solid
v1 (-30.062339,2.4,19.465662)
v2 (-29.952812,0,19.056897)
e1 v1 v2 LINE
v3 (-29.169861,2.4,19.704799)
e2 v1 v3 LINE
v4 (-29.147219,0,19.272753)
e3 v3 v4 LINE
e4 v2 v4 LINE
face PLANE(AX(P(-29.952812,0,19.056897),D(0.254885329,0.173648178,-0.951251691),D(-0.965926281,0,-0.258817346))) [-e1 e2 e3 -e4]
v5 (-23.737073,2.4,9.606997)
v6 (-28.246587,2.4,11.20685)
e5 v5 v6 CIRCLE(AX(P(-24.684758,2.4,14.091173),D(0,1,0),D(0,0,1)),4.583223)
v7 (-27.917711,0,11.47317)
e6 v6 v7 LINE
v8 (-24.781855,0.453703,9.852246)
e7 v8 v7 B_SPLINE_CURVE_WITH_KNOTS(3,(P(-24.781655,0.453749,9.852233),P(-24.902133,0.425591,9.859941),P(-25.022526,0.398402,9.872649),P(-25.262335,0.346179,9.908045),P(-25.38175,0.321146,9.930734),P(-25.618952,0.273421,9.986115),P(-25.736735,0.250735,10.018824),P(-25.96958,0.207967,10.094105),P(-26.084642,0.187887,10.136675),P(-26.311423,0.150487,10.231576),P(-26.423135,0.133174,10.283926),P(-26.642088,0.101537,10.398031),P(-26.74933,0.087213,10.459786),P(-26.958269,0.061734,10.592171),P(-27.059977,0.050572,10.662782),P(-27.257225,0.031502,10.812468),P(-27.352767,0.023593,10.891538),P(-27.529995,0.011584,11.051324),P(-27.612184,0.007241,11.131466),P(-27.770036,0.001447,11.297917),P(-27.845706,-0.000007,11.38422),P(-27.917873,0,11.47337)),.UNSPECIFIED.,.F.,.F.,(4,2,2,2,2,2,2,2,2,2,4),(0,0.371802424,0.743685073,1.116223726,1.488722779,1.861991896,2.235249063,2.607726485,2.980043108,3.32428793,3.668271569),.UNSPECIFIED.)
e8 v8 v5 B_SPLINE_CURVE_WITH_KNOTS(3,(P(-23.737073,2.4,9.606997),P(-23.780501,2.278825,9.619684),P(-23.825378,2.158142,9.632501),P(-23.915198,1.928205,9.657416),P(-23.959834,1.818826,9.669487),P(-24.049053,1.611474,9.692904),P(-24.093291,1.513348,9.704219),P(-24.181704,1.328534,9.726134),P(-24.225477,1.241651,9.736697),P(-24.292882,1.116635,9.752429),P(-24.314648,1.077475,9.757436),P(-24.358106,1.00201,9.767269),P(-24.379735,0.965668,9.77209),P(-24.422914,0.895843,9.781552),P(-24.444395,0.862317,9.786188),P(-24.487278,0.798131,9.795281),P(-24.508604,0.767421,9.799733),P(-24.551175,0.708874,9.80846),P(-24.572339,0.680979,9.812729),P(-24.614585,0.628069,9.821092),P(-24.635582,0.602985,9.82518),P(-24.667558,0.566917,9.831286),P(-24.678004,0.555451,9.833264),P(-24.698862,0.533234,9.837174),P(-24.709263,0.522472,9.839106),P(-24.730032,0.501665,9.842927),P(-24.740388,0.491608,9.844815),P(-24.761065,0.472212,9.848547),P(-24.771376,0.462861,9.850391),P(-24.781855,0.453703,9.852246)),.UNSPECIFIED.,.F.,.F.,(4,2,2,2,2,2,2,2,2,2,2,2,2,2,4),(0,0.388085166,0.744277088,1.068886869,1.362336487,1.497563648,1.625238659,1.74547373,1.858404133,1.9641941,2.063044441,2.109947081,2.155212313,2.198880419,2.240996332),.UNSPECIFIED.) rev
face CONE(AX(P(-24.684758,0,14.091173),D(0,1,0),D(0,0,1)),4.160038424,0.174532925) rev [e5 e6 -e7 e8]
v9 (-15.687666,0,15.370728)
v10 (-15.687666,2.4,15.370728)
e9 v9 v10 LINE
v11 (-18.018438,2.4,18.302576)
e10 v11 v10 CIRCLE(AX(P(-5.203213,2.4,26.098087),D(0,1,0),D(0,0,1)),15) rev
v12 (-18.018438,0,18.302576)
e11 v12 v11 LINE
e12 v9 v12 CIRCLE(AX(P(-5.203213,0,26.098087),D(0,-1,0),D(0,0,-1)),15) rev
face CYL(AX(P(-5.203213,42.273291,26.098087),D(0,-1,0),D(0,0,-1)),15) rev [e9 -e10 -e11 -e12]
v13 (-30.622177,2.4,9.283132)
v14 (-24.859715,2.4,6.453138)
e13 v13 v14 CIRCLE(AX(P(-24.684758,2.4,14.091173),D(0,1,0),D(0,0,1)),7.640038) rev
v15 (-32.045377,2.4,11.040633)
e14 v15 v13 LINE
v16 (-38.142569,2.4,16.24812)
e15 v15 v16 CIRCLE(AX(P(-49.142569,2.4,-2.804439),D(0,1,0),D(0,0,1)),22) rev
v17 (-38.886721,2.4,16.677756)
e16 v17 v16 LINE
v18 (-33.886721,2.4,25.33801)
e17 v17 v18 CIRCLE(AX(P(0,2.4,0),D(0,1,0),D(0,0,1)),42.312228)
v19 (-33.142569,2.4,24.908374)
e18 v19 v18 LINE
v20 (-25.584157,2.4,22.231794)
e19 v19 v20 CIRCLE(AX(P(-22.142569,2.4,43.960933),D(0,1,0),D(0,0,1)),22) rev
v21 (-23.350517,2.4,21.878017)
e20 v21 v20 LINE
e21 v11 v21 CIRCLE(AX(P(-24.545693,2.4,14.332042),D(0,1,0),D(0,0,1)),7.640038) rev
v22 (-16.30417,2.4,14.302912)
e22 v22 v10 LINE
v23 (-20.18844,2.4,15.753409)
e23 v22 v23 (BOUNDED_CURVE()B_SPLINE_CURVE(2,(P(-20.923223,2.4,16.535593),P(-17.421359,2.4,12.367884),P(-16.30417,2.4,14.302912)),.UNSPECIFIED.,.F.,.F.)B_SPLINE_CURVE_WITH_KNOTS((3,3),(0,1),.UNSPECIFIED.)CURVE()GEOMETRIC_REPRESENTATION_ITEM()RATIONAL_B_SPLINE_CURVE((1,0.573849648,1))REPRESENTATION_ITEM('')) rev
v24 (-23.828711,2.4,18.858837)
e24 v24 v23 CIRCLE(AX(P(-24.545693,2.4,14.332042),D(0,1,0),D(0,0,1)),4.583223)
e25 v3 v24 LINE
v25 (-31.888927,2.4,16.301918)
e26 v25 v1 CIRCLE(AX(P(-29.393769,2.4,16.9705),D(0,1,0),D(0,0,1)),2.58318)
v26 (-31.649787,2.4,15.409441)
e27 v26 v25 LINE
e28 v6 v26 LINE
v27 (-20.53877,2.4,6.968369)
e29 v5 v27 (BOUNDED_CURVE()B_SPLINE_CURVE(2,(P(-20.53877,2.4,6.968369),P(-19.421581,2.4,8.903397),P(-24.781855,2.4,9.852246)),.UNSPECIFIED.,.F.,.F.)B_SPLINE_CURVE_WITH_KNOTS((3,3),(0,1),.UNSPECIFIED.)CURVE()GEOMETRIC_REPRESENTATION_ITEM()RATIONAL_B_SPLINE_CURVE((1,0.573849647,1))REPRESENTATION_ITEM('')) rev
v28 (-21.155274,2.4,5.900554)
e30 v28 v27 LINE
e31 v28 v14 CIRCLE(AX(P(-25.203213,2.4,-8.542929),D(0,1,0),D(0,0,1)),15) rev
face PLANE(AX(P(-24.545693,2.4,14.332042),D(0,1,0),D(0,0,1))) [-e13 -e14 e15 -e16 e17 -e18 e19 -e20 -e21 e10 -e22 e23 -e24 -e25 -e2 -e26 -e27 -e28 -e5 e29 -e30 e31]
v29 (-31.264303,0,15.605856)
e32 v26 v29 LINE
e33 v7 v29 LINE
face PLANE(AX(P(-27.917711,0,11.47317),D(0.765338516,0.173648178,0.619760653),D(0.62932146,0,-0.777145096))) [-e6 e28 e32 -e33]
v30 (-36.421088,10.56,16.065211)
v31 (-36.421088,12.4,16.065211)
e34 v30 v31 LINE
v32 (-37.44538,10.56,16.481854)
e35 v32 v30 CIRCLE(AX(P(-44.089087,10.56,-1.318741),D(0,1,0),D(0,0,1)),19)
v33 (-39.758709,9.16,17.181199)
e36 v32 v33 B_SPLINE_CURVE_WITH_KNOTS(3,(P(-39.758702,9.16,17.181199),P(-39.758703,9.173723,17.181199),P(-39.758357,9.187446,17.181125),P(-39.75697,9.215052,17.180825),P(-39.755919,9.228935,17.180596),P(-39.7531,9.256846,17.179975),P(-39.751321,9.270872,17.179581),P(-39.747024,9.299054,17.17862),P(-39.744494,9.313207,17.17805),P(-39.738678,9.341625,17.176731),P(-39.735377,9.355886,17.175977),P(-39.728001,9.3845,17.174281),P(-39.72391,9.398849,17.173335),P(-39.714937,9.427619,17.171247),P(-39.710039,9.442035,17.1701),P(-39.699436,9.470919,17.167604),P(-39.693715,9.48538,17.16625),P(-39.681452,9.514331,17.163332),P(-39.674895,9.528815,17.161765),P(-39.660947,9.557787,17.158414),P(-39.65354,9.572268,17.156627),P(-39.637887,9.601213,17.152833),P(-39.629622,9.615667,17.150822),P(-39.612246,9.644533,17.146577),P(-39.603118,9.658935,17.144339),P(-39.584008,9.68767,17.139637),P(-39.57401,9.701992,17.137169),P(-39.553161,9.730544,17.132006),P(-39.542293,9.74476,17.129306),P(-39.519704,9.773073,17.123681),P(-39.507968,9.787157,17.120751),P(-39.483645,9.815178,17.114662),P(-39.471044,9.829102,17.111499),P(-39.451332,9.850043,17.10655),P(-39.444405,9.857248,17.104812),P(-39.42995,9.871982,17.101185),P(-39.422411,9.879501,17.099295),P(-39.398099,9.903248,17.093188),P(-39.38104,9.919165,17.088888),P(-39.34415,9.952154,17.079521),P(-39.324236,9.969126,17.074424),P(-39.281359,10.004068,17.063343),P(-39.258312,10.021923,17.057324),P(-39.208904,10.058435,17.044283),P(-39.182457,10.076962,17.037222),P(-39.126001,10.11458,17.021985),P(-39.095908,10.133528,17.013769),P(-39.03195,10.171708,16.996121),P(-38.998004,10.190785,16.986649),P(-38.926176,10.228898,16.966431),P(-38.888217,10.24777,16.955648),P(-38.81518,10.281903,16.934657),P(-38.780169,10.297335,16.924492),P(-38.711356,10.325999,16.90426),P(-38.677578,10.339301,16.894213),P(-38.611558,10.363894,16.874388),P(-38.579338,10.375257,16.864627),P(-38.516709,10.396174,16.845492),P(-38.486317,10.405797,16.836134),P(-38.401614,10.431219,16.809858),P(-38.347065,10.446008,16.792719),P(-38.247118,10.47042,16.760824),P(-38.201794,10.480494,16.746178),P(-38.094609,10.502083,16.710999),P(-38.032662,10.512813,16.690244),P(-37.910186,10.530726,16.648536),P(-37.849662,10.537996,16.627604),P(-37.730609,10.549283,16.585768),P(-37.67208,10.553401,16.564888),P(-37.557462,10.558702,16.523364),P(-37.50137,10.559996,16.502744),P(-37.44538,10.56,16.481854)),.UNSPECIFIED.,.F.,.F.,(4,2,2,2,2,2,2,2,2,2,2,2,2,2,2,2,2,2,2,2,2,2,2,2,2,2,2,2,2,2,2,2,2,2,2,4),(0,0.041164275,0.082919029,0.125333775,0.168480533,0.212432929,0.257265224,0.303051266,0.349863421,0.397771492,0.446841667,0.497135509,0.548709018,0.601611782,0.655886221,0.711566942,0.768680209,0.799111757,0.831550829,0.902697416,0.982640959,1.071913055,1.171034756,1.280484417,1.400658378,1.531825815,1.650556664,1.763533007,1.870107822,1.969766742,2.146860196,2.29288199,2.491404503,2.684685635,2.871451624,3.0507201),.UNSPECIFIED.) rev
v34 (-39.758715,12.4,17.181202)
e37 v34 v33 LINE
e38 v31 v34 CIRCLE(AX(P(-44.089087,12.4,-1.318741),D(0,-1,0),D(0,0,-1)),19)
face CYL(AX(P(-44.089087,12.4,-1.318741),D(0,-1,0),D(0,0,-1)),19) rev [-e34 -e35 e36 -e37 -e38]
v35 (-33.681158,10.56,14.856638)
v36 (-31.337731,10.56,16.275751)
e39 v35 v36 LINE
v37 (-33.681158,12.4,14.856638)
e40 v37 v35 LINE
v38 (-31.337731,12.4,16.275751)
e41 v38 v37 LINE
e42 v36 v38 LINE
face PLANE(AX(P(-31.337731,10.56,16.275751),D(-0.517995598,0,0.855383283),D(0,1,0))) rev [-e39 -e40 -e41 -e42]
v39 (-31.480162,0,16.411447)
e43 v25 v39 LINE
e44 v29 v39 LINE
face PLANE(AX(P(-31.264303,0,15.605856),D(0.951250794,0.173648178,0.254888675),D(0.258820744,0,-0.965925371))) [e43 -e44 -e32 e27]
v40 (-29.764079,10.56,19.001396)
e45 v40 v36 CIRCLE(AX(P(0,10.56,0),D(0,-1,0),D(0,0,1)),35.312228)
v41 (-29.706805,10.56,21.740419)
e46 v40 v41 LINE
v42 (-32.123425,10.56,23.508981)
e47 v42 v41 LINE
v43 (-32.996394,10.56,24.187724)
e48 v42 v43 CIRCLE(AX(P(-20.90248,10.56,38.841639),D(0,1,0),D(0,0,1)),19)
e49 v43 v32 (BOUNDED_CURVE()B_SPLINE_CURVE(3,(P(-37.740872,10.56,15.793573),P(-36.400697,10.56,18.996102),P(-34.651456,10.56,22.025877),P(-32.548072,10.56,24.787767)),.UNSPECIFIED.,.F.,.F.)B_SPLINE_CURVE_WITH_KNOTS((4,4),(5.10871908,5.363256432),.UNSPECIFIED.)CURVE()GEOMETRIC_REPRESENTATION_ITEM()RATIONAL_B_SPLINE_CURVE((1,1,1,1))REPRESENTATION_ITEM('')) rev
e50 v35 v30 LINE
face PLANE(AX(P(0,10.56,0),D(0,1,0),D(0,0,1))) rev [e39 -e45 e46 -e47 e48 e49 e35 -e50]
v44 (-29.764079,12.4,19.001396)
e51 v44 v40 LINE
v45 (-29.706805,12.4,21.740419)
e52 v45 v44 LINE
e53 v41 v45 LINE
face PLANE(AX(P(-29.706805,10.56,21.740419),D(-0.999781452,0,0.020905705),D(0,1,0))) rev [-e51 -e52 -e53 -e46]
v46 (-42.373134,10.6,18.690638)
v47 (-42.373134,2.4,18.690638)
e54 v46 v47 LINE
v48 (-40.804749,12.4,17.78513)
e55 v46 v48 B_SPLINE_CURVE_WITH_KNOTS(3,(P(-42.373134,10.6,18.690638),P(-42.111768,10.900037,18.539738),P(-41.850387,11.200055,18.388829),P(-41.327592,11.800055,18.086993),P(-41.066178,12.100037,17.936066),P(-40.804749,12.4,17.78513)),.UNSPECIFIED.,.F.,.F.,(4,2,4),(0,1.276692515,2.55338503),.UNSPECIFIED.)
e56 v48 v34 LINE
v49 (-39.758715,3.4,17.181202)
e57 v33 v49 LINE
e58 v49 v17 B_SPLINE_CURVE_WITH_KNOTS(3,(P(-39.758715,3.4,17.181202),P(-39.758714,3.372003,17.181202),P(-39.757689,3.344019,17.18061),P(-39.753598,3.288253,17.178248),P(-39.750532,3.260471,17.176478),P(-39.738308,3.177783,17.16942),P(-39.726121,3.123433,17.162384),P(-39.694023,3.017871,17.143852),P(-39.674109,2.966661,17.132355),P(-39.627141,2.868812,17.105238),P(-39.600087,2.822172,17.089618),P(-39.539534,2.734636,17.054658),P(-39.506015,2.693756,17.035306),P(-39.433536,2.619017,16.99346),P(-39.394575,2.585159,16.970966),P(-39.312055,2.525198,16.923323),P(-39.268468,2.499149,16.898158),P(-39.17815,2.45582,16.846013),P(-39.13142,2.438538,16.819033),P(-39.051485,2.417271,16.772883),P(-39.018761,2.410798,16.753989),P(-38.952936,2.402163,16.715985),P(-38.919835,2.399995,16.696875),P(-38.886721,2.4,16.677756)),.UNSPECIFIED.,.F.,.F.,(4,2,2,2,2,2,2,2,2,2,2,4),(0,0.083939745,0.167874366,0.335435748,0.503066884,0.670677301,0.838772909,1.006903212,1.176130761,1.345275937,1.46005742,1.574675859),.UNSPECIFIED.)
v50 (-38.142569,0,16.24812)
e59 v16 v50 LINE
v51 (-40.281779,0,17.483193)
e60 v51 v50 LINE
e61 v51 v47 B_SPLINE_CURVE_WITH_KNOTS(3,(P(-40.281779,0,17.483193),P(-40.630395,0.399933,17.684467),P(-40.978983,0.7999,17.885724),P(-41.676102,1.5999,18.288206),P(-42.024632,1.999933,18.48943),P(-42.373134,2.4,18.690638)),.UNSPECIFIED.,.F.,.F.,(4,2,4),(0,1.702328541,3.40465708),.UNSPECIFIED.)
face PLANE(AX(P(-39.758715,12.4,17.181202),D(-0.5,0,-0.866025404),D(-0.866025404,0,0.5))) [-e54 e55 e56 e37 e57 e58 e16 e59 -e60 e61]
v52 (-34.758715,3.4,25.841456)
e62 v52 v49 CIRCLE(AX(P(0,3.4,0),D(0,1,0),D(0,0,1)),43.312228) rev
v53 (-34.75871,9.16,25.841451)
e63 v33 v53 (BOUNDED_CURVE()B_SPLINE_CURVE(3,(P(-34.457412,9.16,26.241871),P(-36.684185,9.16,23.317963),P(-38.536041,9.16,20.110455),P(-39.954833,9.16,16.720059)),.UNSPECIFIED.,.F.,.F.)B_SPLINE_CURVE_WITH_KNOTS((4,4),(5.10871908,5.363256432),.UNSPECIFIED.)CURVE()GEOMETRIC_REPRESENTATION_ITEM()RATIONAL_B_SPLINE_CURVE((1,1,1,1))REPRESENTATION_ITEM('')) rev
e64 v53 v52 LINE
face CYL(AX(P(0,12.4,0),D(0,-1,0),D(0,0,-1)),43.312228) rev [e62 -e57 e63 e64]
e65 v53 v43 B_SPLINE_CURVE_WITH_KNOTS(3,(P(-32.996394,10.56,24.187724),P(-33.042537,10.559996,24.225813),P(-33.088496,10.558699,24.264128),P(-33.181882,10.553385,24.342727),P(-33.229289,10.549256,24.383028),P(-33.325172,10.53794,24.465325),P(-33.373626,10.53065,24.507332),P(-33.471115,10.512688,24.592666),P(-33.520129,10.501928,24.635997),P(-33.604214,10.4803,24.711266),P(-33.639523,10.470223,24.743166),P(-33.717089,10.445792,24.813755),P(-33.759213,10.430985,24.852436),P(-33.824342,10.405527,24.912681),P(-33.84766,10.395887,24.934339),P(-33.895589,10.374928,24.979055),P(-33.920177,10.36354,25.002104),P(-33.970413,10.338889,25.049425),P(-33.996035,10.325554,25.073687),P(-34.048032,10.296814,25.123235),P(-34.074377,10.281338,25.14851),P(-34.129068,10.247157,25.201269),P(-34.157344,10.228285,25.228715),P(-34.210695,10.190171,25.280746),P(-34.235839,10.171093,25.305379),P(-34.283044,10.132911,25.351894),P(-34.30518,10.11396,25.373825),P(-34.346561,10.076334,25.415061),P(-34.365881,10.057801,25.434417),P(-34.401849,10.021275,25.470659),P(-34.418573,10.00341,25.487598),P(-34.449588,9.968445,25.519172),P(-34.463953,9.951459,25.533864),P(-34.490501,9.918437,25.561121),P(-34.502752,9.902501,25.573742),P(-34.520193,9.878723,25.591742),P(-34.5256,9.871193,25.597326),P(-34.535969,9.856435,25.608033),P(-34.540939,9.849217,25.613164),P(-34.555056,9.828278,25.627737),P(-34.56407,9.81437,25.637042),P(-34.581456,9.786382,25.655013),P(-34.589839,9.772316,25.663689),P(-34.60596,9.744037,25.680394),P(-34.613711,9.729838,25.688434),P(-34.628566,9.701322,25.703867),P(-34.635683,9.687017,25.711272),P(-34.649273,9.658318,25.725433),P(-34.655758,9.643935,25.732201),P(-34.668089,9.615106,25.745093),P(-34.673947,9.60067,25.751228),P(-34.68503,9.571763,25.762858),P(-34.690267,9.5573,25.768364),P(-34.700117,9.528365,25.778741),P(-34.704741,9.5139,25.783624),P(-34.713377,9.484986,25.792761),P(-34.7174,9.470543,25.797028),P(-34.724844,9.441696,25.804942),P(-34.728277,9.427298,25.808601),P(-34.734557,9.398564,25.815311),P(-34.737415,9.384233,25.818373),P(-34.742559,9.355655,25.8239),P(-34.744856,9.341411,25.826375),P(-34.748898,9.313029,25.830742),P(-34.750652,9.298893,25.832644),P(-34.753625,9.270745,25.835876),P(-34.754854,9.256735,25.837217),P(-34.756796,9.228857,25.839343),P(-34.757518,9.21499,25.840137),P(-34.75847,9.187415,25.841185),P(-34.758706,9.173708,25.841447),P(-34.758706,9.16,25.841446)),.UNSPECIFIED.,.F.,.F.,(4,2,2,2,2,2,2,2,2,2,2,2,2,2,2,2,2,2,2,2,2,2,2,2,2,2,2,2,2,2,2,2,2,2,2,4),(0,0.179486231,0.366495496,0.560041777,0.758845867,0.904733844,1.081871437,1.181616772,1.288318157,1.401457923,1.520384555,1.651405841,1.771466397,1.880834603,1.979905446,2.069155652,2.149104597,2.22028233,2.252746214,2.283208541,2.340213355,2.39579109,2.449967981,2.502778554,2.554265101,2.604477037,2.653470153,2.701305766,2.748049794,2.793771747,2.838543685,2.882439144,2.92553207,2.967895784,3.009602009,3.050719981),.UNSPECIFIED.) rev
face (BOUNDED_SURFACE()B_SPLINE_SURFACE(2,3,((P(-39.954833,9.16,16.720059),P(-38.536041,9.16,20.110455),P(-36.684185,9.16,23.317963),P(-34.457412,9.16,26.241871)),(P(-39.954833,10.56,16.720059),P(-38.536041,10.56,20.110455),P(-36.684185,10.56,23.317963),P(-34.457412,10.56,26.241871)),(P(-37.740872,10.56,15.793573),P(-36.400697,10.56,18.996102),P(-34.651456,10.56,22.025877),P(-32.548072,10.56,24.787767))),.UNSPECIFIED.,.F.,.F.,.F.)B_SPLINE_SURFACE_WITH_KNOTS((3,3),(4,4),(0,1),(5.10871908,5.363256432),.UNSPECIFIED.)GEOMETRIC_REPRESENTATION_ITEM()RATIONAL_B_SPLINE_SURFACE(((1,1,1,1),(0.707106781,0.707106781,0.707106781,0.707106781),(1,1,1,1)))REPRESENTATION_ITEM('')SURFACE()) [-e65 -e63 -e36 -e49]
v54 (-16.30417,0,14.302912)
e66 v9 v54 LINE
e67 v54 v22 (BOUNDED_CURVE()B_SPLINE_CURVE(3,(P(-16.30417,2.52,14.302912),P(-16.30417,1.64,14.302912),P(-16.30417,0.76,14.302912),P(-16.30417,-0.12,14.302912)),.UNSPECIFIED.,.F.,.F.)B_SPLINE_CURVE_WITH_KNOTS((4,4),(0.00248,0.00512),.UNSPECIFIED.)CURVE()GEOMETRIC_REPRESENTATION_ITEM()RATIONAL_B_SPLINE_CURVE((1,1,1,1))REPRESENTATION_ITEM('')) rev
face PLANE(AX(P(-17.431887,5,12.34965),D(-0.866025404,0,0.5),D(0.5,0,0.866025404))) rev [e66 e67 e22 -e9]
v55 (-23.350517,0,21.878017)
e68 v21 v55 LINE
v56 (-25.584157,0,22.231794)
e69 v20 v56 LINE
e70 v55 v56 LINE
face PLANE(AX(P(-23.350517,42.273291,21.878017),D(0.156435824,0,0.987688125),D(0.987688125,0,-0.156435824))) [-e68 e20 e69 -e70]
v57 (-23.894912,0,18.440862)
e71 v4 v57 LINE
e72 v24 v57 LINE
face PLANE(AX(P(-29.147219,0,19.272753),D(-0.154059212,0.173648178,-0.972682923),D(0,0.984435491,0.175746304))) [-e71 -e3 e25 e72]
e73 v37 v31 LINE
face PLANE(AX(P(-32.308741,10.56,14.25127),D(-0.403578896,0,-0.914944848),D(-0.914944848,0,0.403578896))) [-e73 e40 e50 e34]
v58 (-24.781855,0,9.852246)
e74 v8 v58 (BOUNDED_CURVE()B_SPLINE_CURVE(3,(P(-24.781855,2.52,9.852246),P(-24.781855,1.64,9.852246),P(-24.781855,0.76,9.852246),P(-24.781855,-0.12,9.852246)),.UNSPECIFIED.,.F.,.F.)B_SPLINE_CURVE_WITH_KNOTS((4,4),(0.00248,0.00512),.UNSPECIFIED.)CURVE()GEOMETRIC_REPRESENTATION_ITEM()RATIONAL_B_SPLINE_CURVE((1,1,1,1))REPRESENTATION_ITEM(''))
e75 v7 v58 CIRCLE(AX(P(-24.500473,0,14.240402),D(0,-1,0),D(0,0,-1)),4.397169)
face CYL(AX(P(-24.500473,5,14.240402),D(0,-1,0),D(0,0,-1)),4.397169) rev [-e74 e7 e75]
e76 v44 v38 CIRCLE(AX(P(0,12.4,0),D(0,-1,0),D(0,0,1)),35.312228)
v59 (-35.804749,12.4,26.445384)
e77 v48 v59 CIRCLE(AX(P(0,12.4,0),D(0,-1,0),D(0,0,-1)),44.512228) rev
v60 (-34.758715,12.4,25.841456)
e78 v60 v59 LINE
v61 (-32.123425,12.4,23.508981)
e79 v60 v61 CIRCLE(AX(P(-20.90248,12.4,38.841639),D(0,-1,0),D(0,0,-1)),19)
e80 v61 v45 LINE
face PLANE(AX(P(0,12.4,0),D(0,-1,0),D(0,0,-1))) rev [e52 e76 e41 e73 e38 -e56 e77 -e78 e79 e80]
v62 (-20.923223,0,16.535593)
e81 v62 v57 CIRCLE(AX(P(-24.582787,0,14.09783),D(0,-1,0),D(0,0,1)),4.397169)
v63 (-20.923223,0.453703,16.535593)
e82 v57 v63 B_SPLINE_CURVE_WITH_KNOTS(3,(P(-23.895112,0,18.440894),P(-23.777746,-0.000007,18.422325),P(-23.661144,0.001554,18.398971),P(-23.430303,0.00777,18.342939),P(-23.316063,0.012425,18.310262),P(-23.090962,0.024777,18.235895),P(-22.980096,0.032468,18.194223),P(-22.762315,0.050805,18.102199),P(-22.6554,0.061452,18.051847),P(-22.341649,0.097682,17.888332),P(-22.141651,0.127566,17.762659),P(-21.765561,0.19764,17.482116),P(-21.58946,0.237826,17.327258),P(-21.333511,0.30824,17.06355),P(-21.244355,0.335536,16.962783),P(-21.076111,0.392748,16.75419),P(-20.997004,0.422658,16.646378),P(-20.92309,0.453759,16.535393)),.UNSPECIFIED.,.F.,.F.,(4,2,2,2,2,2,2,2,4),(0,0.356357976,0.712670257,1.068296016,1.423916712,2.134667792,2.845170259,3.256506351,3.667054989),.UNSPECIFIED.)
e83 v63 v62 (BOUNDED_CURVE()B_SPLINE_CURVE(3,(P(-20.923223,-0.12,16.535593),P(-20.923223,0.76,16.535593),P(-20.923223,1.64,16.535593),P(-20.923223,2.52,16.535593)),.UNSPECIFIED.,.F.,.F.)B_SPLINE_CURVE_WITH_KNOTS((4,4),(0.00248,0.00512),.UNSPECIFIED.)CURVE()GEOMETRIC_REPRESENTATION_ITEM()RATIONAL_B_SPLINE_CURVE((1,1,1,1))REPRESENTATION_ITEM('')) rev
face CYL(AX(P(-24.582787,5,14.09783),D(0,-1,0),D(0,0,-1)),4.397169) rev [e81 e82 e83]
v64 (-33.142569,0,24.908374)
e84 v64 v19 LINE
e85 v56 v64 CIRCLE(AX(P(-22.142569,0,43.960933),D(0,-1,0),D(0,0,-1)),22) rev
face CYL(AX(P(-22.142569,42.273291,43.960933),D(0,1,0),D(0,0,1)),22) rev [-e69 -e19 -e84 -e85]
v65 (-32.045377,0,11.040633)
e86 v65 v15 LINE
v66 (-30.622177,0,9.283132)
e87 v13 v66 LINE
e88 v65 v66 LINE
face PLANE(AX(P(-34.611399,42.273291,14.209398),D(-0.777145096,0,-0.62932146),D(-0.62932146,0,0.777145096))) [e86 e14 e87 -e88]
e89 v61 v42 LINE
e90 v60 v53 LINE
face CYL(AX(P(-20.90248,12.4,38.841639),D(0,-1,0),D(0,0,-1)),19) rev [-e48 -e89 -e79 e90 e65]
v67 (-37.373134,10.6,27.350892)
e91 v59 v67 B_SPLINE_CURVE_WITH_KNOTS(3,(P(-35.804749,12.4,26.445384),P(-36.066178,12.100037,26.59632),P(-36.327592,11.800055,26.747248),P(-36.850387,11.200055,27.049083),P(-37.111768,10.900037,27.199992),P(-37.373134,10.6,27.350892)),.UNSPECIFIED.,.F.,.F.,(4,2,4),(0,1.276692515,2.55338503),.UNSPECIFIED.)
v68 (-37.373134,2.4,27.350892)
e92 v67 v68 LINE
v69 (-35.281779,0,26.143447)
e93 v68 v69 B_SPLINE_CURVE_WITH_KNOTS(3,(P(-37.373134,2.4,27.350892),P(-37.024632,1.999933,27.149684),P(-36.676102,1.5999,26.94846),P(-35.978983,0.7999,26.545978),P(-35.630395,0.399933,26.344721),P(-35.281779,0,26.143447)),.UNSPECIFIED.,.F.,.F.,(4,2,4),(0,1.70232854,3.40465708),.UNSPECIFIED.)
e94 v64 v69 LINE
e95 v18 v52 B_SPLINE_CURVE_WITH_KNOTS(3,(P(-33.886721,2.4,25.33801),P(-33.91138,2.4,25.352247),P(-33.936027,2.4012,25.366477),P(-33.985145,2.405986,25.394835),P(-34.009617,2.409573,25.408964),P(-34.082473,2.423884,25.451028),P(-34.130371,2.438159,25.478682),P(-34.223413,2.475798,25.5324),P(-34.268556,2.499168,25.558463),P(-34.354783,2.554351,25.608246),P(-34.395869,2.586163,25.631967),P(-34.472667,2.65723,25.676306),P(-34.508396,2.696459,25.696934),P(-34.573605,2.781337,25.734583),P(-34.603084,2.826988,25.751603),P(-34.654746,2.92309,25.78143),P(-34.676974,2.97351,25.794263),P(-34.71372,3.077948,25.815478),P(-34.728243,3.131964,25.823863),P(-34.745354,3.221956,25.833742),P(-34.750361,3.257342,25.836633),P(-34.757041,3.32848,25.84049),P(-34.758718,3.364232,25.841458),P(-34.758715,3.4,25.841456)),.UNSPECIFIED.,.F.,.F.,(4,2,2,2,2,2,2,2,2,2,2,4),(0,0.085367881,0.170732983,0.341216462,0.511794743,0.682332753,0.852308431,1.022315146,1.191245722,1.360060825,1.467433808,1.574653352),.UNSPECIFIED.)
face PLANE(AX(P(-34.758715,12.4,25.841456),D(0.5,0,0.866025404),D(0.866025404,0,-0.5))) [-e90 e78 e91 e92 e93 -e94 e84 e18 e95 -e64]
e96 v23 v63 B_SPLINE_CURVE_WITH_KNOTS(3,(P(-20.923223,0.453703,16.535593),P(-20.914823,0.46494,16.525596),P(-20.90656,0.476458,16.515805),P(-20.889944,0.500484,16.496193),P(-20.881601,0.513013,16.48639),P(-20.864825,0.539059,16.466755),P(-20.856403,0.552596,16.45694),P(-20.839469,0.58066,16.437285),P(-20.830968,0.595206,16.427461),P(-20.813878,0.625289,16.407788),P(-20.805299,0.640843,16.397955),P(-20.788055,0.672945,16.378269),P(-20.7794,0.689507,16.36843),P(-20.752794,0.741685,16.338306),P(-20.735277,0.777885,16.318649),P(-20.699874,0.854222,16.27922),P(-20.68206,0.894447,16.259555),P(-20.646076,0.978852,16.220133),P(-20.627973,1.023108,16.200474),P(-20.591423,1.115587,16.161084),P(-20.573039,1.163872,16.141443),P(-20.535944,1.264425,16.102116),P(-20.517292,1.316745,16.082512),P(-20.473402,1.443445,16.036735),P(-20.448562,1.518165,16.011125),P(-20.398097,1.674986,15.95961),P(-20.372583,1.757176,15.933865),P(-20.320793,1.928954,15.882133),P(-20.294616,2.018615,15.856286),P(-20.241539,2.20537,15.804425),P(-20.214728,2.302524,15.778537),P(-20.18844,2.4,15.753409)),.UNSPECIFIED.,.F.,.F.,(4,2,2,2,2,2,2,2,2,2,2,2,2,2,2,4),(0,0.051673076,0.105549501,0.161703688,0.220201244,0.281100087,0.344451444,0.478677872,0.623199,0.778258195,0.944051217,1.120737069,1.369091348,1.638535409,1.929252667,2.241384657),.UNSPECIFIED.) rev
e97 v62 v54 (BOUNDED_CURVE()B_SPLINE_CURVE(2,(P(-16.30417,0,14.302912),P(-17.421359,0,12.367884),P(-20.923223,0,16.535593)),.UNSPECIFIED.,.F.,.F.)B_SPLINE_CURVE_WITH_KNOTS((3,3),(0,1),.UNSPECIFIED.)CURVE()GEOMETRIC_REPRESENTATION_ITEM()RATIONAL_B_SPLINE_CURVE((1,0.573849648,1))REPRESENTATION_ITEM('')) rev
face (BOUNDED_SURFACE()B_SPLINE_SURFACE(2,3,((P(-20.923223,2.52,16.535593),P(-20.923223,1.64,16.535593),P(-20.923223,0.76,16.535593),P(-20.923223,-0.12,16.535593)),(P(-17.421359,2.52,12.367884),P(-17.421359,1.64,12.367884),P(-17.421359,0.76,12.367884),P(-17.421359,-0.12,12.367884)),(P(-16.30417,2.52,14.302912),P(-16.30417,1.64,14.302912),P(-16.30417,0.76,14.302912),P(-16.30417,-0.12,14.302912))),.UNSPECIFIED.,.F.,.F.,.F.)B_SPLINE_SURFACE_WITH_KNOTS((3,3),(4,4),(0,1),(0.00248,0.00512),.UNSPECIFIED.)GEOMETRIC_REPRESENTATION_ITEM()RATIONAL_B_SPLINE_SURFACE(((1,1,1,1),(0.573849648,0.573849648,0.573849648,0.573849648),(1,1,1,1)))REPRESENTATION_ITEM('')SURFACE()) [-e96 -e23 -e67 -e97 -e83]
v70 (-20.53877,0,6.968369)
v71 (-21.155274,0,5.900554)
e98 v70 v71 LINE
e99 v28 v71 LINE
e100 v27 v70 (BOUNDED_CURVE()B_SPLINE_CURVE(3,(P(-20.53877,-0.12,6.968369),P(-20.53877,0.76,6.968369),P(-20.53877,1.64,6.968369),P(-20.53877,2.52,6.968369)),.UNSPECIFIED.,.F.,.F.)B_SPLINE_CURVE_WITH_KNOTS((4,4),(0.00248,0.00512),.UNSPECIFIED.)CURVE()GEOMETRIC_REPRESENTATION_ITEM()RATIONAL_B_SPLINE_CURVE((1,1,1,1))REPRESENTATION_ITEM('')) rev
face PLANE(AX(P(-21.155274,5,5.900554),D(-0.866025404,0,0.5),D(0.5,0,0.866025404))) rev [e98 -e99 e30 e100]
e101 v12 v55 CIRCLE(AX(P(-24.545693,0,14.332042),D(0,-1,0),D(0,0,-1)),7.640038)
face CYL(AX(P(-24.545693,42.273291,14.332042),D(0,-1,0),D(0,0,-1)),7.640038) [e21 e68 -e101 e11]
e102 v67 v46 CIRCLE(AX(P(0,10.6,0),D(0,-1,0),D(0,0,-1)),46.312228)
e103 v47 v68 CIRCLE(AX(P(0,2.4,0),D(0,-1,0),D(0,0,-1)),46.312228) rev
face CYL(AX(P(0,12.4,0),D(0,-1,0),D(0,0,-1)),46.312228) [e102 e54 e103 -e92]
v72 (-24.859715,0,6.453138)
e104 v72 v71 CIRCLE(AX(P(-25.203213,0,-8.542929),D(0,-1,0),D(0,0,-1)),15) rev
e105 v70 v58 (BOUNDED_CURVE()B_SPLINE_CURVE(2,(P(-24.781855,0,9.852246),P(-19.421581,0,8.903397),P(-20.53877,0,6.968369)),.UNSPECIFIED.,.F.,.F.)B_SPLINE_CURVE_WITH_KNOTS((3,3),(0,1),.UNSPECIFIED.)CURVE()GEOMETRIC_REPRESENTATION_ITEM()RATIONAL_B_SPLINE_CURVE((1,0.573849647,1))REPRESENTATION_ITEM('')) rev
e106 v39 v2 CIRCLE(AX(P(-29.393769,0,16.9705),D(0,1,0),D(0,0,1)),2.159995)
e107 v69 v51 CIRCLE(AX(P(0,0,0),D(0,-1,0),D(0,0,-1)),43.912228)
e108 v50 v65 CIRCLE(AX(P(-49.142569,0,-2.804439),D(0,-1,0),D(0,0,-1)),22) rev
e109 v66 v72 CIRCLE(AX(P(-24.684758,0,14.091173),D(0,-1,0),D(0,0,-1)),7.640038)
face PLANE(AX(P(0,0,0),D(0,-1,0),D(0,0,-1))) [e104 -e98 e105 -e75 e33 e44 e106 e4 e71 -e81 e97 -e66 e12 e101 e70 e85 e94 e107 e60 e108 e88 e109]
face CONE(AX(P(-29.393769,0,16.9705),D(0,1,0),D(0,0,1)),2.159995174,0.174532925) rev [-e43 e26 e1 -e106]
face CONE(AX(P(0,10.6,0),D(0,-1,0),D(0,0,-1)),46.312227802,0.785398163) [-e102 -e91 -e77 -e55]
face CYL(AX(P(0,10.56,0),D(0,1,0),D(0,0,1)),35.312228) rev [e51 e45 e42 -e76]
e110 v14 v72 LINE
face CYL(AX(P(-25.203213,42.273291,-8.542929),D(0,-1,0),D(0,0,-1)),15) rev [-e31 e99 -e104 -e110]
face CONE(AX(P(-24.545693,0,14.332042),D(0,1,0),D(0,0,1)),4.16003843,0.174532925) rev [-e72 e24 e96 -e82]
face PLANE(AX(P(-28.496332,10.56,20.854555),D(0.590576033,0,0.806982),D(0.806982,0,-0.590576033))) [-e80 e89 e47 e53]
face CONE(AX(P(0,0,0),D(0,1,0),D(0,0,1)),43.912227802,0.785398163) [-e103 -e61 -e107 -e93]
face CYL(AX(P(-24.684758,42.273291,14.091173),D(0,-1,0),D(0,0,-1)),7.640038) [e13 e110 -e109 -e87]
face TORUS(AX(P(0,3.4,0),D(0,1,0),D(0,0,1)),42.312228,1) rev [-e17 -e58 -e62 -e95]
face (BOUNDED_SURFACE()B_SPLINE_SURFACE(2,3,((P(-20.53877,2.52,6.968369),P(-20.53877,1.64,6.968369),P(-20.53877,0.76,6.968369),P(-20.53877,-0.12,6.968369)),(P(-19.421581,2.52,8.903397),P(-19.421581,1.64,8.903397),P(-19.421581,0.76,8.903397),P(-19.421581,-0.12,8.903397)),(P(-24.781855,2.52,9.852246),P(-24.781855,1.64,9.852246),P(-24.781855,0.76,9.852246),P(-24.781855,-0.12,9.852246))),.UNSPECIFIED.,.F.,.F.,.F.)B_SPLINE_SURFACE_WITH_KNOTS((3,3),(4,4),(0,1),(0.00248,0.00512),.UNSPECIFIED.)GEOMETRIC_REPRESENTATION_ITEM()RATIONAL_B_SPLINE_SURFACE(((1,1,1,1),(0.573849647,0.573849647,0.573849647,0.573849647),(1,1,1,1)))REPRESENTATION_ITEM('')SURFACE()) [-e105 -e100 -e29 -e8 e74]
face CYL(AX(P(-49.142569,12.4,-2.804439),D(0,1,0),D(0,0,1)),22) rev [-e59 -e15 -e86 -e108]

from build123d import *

# Parameters (mm, degrees)
EXTRUDE_1_DEPTH     = 2.4
EXTRUDE_1_DRAFT     = 10
EXTRUDE_2_DEPTH     = 12.4
EXTRUDE_4_DEPTH     = 2.4
EXTRUDE_START       = -1.84
EXTRUDE_3_DEPTH     = 1.84
CHAMFER_1_SIZE      = 2.4
FILLET_3_R          = 1
FILLET_4_R          = 19
CHAMFER_2_SIZE      = 1.5
CHAMFER_3_SIZE      = 1.5
FILLET_5_SIZE       = 2.4
FILLET_5_SIZE_2     = 1.4
FILLET_8_R          = 15
CUT_EXTRUDE_2_DEPTH = 5
FILLET_6_DEPTH      = 2.4
FILLET_7_DEPTH      = 2.4
CHAMFER_4_SIZE      = 1.8
FILLET_9_R          = 22


with BuildPart() as part:
    # 草图1 → 凸台-拉伸1 (with draft: the straight prism first)
    with BuildSketch(Plane(origin=(0, 0, 0), x_dir=(1, 0, 0), z_dir=(0, 1, 0))):
        with BuildLine():
            Line((-8, -10.392304845), (-13, -1.732050808))
            Line((-13, -1.732050808), (-21.967816979, -6.909622355))
            Line((-21.967816979, -6.909622355), (-22.707395472, -6.711455524))
            ThreePointArc((-22.707395472, -6.711455524), (-27.045667208, -6.825066474), (-30.622176838, -9.283132374))
            Line((-30.622176838, -9.283132374), (-34.43427487, -13.990668154))
            Line((-34.43427487, -13.990668154), (-34.611399325, -14.209398026))
            Line((-34.611399325, -14.209398026), (-39.758714523, -17.181201841))
            ThreePointArc((-39.758714523, -17.181201841), (-37.509489571, -21.656113901), (-34.758714523, -25.841455878))
            Line((-34.758714523, -25.841455878), (-29.611399325, -22.869652063))
            Line((-29.611399325, -22.869652063), (-29.333411472, -22.825622721))
            Line((-29.333411472, -22.825622721), (-23.350516885, -21.878016874))
            ThreePointArc((-23.350516885, -21.878016874), (-19.433514554, -20.009701627), (-17.165988715, -16.309453567))
            Line((-17.165988715, -16.309453567), (-16.967816979, -15.569876393))
            Line((-16.967816979, -15.569876393), (-8, -10.392304845))
        make_face()
        with BuildLine():
            Line((-27.917710858, -11.473169763), (-31.264303283, -15.605855609))
            Line((-31.264303283, -15.605855609), (-31.480162481, -16.411447438))
            ThreePointArc((-31.480162481, -16.411447438), (-31.264379417, -18.05049777), (-29.952811807, -19.056896659))
            Line((-29.952811807, -19.056896659), (-29.147219046, -19.27275307))
            Line((-29.147219046, -19.27275307), (-23.894912088, -18.440861966))
            ThreePointArc((-23.894912088, -18.440861966), (-21.762087, -17.423555776), (-20.527408298, -15.408754734))
            Line((-20.527408298, -15.408754734), (-19.958845574, -13.286877913))
            ThreePointArc((-19.958845574, -13.286877913), (-20.174626779, -11.647826039), (-21.486196869, -10.641428268))
            Line((-21.486196869, -10.641428268), (-23.608077089, -10.07287972))
            ThreePointArc((-23.608077089, -10.07287972), (-25.97028529, -10.134742248), (-27.917710858, -11.473169763))
        make_face(mode=Mode.SUBTRACT)
    extrude(amount=EXTRUDE_1_DEPTH)
    # 凸台-拉伸1: the draft: its side faces are tilted about the plane it starts from
    extrude_1_sides = [part.faces().sort_by_distance(p)[0] for p in [
        (-26.480958105, 1.2, 22.373834469),
        (-29.59100707, 1.2, 13.539512686),
        (-31.372232882, 1.2, 16.008651523),
        (-31.264379417, 1.2, 18.05049777),
        (-29.550015427, 1.2, 19.164824864),
        (-26.521065567, 1.2, 18.856807518),
        (-21.762087, 1.2, 17.423555776),
        (-20.243126936, 1.2, 14.347816323),
        (-20.174626779, 1.2, 11.647826039),
        (-22.547136979, 1.2, 10.357153994),
        (-25.97028529, 1.2, 10.134742248),
        (-37.509489571, 1.2, 21.656113901),
        (-37.185056924, 1.2, 15.695299933),
        (-32.616788082, 1.2, 11.7462652),
        (-27.045667208, 1.2, 6.825066474),
        (-22.337606226, 1.2, 6.810538939),
        (-17.48390849, 1.2, 4.320836581),
        (-10.5, 1.2, 6.062177826),
        (-12.48390849, 1.2, 12.981090619),
        (-17.066902847, 1.2, 15.93966498),
        (-32.185056924, 1.2, 24.355553971),
        (-19.433514554, 1.2, 20.009701627),
    ]]
    draft(extrude_1_sides, Plane(origin=(0, 0, 0), x_dir=(1, 0, 0), z_dir=(0, 1, 0)), EXTRUDE_1_DRAFT)



with BuildPart() as body_2:
    # 草图3 → 凸台-拉伸2 (new body)
    with BuildSketch(Plane.XZ):
        with BuildLine():
            Line((-34.758714523, 25.841455878), (-37.373134226, 27.350891798))
            ThreePointArc((-37.373134226, 27.350891798), (-40.107565783, 23.156113901), (-42.373134226, 18.69063776))
            Line((-42.373134226, 18.69063776), (-39.758714523, 17.181201841))
            ThreePointArc((-39.758714523, 17.181201841), (-37.509489571, 21.656113901), (-34.758714523, 25.841455878))
        make_face()
    extrude(amount=-EXTRUDE_2_DEPTH)


with BuildPart() as part_1:
    add(part.part)

    add(body_2.part)  # 凸台-拉伸4 merges body 2
    # 草图2 → 凸台-拉伸4 (add)
    with BuildSketch(Plane.XZ):
        with BuildLine():
            Line((-13, 1.732050808), (-8, 10.392304845))
            Line((-8, 10.392304845), (-16.967816979, 15.569876393))
            Line((-16.967816979, 15.569876393), (-17.165988715, 16.309453567))
            ThreePointArc((-17.165988715, 16.309453567), (-19.433514554, 20.009701627), (-23.350516885, 21.878016874))
            Line((-23.350516885, 21.878016874), (-29.611399325, 22.869652063))
            Line((-29.611399325, 22.869652063), (-34.758714523, 25.841455878))
            ThreePointArc((-34.758714523, 25.841455878), (-37.509489571, 21.656113901), (-39.758714523, 17.181201841))
            Line((-39.758714523, 17.181201841), (-34.611399325, 14.209398026))
            Line((-34.611399325, 14.209398026), (-30.622176838, 9.283132374))
            ThreePointArc((-30.622176838, 9.283132374), (-27.045667208, 6.825066474), (-22.707395472, 6.711455524))
            Line((-22.707395472, 6.711455524), (-21.967816979, 6.909622355))
            Line((-21.967816979, 6.909622355), (-13, 1.732050808))
        make_face()
        Polygon((-28.267922288, 9.695660603), (-32.994912051, 15.569876392), (-31.812956682, 19.594100966), (-26.346816011, 20.919608689), (-19.040272004, 17.121163853), (-18.489608424, 9.956624946), (-26.72941961, 8.295337377), align=None, mode=Mode.SUBTRACT)
    extrude(amount=-EXTRUDE_4_DEPTH)

    # 草图4 → 凸台-拉伸3 (add)
    with BuildSketch(Plane(origin=(0, 12.4, 0), x_dir=(1, 0, 0), z_dir=(0, 1, 0)).offset(EXTRUDE_START)):
        with BuildLine():
            Line((-32.308740898, -14.251269906), (-42.373134226, -18.69063776))
            ThreePointArc((-42.373134226, -18.69063776), (-40.107565783, -23.156113901), (-37.373134226, -27.350891798))
            Line((-37.373134226, -27.350891798), (-28.496332224, -20.854555429))
            ThreePointArc((-28.496332224, -20.854555429), (-30.581286341, -17.656113901), (-32.308740898, -14.251269906))
        make_face()
    extrude(amount=EXTRUDE_3_DEPTH)

    # 倒角1
    chamfer_1_edges = [part_1.edges().sort_by_distance(p)[0] for p in [
        (-40.107565783, 0, 23.156113901),
    ]]
    chamfer(chamfer_1_edges, length=CHAMFER_1_SIZE)

    # 圆角3
    fillet_3_edges = [part_1.edges().sort_by_distance(p)[0] for p in [
        (-37.509489571, 2.4, 21.656113901),
    ]]
    fillet(fillet_3_edges, radius=FILLET_3_R)

    # 圆角4
    # the kernel refuses this fillet: 19 mm, written as the material it adds along each edge
    with BuildSketch(Plane(origin=(-34.952188225, 12.4, 25.579163697), x_dir=(0.5936081582817637, 0, 0.8047542198841411), z_dir=(0, -1, 0))) as fillet_4_piece_1:
        with BuildLine():
            CenterArc((19.013054585, -3.433847914), FILLET_4_R, 169.587784597, 10.627793791)
            Line((0.013189074, -3.505336246), (0, 0))
            ThreePointArc((0, 0), (0.162964154, 0.000306581), (0.325928308, 0))
        make_face()
    extrude(amount=1.84)
    with BuildSketch(Plane(origin=(-39.628299682, 12.4, 17.479901072), x_dir=(-0.4001335190817456, 0, -0.9164568549076701), z_dir=(0, -1, 0))) as fillet_4_piece_2:
        with BuildLine():
            CenterArc((19.013054585, 3.433847914), FILLET_4_R, 179.784421612, 10.627793791)
            Line((0.013189074, 3.505336246), (0, 0))
            ThreePointArc((0, 0), (0.162964154, -0.000306581), (0.325928308, 0))
        make_face()
    extrude(amount=1.84)

    # 倒角2
    # the kernel refuses this chamfer: 2.14222201, 1.5 mm, written as the material it takes off along each edge
    with BuildSketch(Plane(origin=(-32.308740898, 4.766259481, 14.251269906), x_dir=(-0.9149448479771033, 0, 0.40357889583098305), z_dir=(0, 1, 0))) as chamfer_2_piece_1:
        with BuildLine():
            Line((CHAMFER_2_SIZE, 0), (-0.071382965, 2.24416745))
            ThreePointArc((-0.071382965, 2.24416745), (-0.019009883, 1.158534109), (0, 0))
            Line((0, 0), (CHAMFER_2_SIZE, 0))
        make_face()
    extrude(amount=13.427481039, mode=Mode.SUBTRACT)

    # 倒角3
    # the kernel refuses this chamfer: 2.14222201, 1.5 mm, written as the material it takes off along each edge
    with BuildSketch(Plane(origin=(-28.496332224, 4.766259481, 20.854555429), x_dir=(-0.564621815428285, 0, -0.8253497474055879), z_dir=(0, 1, 0))) as chamfer_3_piece_1:
        with BuildLine():
            Line((2.245302445, 0), (-CHAMFER_3_SIZE * 0.0317921380924, CHAMFER_3_SIZE * 0.999494502214))
            Line((-CHAMFER_3_SIZE * 0.0317921380924, CHAMFER_3_SIZE * 0.999494502214), (0, 0))
            ThreePointArc((0, 0), (1.158552838, 0.017832003), (2.245302445, 0))
        make_face()
    extrude(amount=13.427481039, mode=Mode.SUBTRACT)

    # 圆角5
    # a fillet whose section is not a circle: 2.4, 1.4 mm, written as the material it adds along each edge
    with BuildSketch(Plane(origin=(-2e-09, 10.56, 2e-09), x_dir=(-0.7124395855651336, 0, 0.7017334514755447), z_dir=(0.7017334514755447, 0, 0.7124395855651336))) as fillet_5_piece_1_section:
        with BuildLine():
            Bezier((43.3122278 - FILLET_5_SIZE, 0), (43.3122278, 0), (43.3122278, FILLET_5_SIZE_2), weights=[1, 0.707106781, 1])
            Line((43.3122278, FILLET_5_SIZE_2), (43.3122278, 0))
            Line((43.3122278, 0), (43.3122278 - FILLET_5_SIZE, 0))
        make_face()
    fillet_5_piece_1 = revolve(axis=Axis((-2e-09, 10.56, 2e-09), (0, -1, 0)), revolution_arc=20.76414098, mode=Mode.PRIVATE)
    fillet_5_piece_1 = fillet_5_piece_1 - Plane(origin=(-20.90248031, 10.56, 38.841639471), x_dir=(0.5936081582819842, 0, 0.8047542198839785), z_dir=(0, 1, 0)) * Cylinder(19, 174, mode=Mode.PRIVATE)
    fillet_5_piece_1 = split(fillet_5_piece_1, bisect_by=Plane(origin=(2.499999998, 10.56, 4.33012702), z_dir=(-0.5000000000000001, 0, -0.8660254037844386)), keep=Keep.TOP, mode=Mode.PRIVATE)
    add(fillet_5_piece_1)
    with BuildSketch(Plane(origin=(-3e-09, 10.56, 1e-09), x_dir=(-0.9149448479769536, 0, 0.4035788958313223), z_dir=(0.4035788958313223, 0, 0.9149448479769536))) as fillet_5_piece_2_section:
        with BuildLine():
            Bezier((43.3122278 - FILLET_5_SIZE, 0), (43.3122278, 0), (43.3122278, FILLET_5_SIZE_2), weights=[1, 0.707106781, 1])
            Line((43.3122278, FILLET_5_SIZE_2), (43.3122278, 0))
            Line((43.3122278, 0), (43.3122278 - FILLET_5_SIZE, 0))
        make_face()
    fillet_5_piece_2 = revolve(axis=Axis((-3e-09, 10.56, 1e-09), (0, -1, 0)), revolution_arc=8.368284413, mode=Mode.PRIVATE)
    fillet_5_piece_2 = fillet_5_piece_2 - Plane(origin=(-44.089086662, 10.56, -1.318740785), x_dir=(-0.4001335190818383, 0, -0.9164568549076296), z_dir=(0, 1, 0)) * Cylinder(19, 174, mode=Mode.PRIVATE)
    fillet_5_piece_2 = split(fillet_5_piece_2, bisect_by=Plane(origin=(-2.500000002, 10.56, -4.330127018), z_dir=(0.4999999999999988, 0, 0.8660254037844394)), keep=Keep.TOP, mode=Mode.PRIVATE)
    add(fillet_5_piece_2)

    # 圆角8
    fillet_8_edges = [part_1.edges().sort_by_distance(p)[0] for p in [
        (-16.967816979, 1.2, 15.569876393),
        (-21.967816979, 1.2, 6.909622355),
    ]]
    fillet(fillet_8_edges, radius=FILLET_8_R)

    # 草图5 → 切除-拉伸2 (cut)
    with BuildSketch(Plane.XZ):
        with BuildLine():
            Line((-29.147219046, 19.27275307), (-31.264303283, 15.605855609))
            Line((-31.264303283, 15.605855609), (-27.917710858, 11.473169763))
            ThreePointArc((-27.917710858, 11.473169763), (-26.519580592, 10.33421548), (-24.781854923, 9.852245982))
            ThreePointArc((-24.781854923, 9.852245982), (-22.061802465, 9.586923289), (-19.411053684, 8.921632073))
            Line((-19.411053684, 8.921632073), (-21.155274081, 5.900553727))
            Line((-21.155274081, 5.900553727), (-15.208253994, -4.420406035))
            Line((-15.208253994, -4.420406035), (0.192169605, 10.177783302))
            Line((0.192169605, 10.177783302), (-15.687666464, 15.370727914))
            Line((-15.687666464, 15.370727914), (-17.431886861, 12.349649567))
            ThreePointArc((-17.431886861, 12.349649567), (-19.333420345, 14.312619743), (-20.923222766, 16.535592924))
            ThreePointArc((-20.923222766, 16.535592924), (-22.209483528, 17.799522767), (-23.894912088, 18.440861966))
            Line((-23.894912088, 18.440861966), (-29.147219046, 19.27275307))
        make_face()
    extrude(amount=-CUT_EXTRUDE_2_DEPTH, mode=Mode.SUBTRACT)

    # 圆角6: read off the stored shape, not the designer's step
    # 圆角6 outline → 圆角6 (cut)
    with BuildSketch(Plane(origin=(0, 0, 0), x_dir=(1, 0, 0), z_dir=(0, 1, 0))):
        with BuildLine():
            Line((-19.411053684, -8.921632073), (-20.538770468, -6.968369307))
            add(Edge.make_bspline(
                [(-20.538770468, -6.968369307), (-19.421581423, -8.903397494), (-24.781854923, -9.852245982)],
                knots=[0, 0, 0, 1, 1, 1], degree=2, weights=[1, 0.573849647, 1]))
            ThreePointArc((-24.781854923, -9.852245982), (-22.061802466, -9.586923289), (-19.411053684, -8.921632073))
        make_face()
    extrude(amount=FILLET_6_DEPTH, mode=Mode.SUBTRACT)

    # 圆角7: read off the stored shape, not the designer's step
    # 圆角7 outline → 圆角7 (cut)
    with BuildSketch(Plane(origin=(0, 0, 0), x_dir=(1, 0, 0), z_dir=(0, 1, 0))):
        with BuildLine():
            ThreePointArc((-17.431886861, -12.349649567), (-19.333420346, -14.312619744), (-20.923222767, -16.535592926))
            add(Edge.make_bspline(
                [(-20.923222767, -16.535592926), (-17.421359117, -12.367884155), (-16.304170077, -14.302912333)],
                knots=[0, 0, 0, 1, 1, 1], degree=2, weights=[1, 0.573849648, 1]))
            Line((-16.304170077, -14.302912333), (-17.431886861, -12.349649567))
        make_face()
    extrude(amount=FILLET_7_DEPTH, mode=Mode.SUBTRACT)

    # 倒角4
    chamfer_4_edges = [part_1.edges().sort_by_distance(p)[0] for p in [
        (-40.107565783, 12.4, 23.156113901),
    ]]
    chamfer(chamfer_4_edges, length=CHAMFER_4_SIZE)

    # 圆角9
    fillet_9_edges = [part_1.edges().sort_by_distance(p)[0] for p in [
        (-34.611399325, 1.2, 14.209398026),
        (-29.611399325, 1.2, 22.869652063),
    ]]
    fillet(fillet_9_edges, radius=FILLET_9_R)


solid = part_1.part
